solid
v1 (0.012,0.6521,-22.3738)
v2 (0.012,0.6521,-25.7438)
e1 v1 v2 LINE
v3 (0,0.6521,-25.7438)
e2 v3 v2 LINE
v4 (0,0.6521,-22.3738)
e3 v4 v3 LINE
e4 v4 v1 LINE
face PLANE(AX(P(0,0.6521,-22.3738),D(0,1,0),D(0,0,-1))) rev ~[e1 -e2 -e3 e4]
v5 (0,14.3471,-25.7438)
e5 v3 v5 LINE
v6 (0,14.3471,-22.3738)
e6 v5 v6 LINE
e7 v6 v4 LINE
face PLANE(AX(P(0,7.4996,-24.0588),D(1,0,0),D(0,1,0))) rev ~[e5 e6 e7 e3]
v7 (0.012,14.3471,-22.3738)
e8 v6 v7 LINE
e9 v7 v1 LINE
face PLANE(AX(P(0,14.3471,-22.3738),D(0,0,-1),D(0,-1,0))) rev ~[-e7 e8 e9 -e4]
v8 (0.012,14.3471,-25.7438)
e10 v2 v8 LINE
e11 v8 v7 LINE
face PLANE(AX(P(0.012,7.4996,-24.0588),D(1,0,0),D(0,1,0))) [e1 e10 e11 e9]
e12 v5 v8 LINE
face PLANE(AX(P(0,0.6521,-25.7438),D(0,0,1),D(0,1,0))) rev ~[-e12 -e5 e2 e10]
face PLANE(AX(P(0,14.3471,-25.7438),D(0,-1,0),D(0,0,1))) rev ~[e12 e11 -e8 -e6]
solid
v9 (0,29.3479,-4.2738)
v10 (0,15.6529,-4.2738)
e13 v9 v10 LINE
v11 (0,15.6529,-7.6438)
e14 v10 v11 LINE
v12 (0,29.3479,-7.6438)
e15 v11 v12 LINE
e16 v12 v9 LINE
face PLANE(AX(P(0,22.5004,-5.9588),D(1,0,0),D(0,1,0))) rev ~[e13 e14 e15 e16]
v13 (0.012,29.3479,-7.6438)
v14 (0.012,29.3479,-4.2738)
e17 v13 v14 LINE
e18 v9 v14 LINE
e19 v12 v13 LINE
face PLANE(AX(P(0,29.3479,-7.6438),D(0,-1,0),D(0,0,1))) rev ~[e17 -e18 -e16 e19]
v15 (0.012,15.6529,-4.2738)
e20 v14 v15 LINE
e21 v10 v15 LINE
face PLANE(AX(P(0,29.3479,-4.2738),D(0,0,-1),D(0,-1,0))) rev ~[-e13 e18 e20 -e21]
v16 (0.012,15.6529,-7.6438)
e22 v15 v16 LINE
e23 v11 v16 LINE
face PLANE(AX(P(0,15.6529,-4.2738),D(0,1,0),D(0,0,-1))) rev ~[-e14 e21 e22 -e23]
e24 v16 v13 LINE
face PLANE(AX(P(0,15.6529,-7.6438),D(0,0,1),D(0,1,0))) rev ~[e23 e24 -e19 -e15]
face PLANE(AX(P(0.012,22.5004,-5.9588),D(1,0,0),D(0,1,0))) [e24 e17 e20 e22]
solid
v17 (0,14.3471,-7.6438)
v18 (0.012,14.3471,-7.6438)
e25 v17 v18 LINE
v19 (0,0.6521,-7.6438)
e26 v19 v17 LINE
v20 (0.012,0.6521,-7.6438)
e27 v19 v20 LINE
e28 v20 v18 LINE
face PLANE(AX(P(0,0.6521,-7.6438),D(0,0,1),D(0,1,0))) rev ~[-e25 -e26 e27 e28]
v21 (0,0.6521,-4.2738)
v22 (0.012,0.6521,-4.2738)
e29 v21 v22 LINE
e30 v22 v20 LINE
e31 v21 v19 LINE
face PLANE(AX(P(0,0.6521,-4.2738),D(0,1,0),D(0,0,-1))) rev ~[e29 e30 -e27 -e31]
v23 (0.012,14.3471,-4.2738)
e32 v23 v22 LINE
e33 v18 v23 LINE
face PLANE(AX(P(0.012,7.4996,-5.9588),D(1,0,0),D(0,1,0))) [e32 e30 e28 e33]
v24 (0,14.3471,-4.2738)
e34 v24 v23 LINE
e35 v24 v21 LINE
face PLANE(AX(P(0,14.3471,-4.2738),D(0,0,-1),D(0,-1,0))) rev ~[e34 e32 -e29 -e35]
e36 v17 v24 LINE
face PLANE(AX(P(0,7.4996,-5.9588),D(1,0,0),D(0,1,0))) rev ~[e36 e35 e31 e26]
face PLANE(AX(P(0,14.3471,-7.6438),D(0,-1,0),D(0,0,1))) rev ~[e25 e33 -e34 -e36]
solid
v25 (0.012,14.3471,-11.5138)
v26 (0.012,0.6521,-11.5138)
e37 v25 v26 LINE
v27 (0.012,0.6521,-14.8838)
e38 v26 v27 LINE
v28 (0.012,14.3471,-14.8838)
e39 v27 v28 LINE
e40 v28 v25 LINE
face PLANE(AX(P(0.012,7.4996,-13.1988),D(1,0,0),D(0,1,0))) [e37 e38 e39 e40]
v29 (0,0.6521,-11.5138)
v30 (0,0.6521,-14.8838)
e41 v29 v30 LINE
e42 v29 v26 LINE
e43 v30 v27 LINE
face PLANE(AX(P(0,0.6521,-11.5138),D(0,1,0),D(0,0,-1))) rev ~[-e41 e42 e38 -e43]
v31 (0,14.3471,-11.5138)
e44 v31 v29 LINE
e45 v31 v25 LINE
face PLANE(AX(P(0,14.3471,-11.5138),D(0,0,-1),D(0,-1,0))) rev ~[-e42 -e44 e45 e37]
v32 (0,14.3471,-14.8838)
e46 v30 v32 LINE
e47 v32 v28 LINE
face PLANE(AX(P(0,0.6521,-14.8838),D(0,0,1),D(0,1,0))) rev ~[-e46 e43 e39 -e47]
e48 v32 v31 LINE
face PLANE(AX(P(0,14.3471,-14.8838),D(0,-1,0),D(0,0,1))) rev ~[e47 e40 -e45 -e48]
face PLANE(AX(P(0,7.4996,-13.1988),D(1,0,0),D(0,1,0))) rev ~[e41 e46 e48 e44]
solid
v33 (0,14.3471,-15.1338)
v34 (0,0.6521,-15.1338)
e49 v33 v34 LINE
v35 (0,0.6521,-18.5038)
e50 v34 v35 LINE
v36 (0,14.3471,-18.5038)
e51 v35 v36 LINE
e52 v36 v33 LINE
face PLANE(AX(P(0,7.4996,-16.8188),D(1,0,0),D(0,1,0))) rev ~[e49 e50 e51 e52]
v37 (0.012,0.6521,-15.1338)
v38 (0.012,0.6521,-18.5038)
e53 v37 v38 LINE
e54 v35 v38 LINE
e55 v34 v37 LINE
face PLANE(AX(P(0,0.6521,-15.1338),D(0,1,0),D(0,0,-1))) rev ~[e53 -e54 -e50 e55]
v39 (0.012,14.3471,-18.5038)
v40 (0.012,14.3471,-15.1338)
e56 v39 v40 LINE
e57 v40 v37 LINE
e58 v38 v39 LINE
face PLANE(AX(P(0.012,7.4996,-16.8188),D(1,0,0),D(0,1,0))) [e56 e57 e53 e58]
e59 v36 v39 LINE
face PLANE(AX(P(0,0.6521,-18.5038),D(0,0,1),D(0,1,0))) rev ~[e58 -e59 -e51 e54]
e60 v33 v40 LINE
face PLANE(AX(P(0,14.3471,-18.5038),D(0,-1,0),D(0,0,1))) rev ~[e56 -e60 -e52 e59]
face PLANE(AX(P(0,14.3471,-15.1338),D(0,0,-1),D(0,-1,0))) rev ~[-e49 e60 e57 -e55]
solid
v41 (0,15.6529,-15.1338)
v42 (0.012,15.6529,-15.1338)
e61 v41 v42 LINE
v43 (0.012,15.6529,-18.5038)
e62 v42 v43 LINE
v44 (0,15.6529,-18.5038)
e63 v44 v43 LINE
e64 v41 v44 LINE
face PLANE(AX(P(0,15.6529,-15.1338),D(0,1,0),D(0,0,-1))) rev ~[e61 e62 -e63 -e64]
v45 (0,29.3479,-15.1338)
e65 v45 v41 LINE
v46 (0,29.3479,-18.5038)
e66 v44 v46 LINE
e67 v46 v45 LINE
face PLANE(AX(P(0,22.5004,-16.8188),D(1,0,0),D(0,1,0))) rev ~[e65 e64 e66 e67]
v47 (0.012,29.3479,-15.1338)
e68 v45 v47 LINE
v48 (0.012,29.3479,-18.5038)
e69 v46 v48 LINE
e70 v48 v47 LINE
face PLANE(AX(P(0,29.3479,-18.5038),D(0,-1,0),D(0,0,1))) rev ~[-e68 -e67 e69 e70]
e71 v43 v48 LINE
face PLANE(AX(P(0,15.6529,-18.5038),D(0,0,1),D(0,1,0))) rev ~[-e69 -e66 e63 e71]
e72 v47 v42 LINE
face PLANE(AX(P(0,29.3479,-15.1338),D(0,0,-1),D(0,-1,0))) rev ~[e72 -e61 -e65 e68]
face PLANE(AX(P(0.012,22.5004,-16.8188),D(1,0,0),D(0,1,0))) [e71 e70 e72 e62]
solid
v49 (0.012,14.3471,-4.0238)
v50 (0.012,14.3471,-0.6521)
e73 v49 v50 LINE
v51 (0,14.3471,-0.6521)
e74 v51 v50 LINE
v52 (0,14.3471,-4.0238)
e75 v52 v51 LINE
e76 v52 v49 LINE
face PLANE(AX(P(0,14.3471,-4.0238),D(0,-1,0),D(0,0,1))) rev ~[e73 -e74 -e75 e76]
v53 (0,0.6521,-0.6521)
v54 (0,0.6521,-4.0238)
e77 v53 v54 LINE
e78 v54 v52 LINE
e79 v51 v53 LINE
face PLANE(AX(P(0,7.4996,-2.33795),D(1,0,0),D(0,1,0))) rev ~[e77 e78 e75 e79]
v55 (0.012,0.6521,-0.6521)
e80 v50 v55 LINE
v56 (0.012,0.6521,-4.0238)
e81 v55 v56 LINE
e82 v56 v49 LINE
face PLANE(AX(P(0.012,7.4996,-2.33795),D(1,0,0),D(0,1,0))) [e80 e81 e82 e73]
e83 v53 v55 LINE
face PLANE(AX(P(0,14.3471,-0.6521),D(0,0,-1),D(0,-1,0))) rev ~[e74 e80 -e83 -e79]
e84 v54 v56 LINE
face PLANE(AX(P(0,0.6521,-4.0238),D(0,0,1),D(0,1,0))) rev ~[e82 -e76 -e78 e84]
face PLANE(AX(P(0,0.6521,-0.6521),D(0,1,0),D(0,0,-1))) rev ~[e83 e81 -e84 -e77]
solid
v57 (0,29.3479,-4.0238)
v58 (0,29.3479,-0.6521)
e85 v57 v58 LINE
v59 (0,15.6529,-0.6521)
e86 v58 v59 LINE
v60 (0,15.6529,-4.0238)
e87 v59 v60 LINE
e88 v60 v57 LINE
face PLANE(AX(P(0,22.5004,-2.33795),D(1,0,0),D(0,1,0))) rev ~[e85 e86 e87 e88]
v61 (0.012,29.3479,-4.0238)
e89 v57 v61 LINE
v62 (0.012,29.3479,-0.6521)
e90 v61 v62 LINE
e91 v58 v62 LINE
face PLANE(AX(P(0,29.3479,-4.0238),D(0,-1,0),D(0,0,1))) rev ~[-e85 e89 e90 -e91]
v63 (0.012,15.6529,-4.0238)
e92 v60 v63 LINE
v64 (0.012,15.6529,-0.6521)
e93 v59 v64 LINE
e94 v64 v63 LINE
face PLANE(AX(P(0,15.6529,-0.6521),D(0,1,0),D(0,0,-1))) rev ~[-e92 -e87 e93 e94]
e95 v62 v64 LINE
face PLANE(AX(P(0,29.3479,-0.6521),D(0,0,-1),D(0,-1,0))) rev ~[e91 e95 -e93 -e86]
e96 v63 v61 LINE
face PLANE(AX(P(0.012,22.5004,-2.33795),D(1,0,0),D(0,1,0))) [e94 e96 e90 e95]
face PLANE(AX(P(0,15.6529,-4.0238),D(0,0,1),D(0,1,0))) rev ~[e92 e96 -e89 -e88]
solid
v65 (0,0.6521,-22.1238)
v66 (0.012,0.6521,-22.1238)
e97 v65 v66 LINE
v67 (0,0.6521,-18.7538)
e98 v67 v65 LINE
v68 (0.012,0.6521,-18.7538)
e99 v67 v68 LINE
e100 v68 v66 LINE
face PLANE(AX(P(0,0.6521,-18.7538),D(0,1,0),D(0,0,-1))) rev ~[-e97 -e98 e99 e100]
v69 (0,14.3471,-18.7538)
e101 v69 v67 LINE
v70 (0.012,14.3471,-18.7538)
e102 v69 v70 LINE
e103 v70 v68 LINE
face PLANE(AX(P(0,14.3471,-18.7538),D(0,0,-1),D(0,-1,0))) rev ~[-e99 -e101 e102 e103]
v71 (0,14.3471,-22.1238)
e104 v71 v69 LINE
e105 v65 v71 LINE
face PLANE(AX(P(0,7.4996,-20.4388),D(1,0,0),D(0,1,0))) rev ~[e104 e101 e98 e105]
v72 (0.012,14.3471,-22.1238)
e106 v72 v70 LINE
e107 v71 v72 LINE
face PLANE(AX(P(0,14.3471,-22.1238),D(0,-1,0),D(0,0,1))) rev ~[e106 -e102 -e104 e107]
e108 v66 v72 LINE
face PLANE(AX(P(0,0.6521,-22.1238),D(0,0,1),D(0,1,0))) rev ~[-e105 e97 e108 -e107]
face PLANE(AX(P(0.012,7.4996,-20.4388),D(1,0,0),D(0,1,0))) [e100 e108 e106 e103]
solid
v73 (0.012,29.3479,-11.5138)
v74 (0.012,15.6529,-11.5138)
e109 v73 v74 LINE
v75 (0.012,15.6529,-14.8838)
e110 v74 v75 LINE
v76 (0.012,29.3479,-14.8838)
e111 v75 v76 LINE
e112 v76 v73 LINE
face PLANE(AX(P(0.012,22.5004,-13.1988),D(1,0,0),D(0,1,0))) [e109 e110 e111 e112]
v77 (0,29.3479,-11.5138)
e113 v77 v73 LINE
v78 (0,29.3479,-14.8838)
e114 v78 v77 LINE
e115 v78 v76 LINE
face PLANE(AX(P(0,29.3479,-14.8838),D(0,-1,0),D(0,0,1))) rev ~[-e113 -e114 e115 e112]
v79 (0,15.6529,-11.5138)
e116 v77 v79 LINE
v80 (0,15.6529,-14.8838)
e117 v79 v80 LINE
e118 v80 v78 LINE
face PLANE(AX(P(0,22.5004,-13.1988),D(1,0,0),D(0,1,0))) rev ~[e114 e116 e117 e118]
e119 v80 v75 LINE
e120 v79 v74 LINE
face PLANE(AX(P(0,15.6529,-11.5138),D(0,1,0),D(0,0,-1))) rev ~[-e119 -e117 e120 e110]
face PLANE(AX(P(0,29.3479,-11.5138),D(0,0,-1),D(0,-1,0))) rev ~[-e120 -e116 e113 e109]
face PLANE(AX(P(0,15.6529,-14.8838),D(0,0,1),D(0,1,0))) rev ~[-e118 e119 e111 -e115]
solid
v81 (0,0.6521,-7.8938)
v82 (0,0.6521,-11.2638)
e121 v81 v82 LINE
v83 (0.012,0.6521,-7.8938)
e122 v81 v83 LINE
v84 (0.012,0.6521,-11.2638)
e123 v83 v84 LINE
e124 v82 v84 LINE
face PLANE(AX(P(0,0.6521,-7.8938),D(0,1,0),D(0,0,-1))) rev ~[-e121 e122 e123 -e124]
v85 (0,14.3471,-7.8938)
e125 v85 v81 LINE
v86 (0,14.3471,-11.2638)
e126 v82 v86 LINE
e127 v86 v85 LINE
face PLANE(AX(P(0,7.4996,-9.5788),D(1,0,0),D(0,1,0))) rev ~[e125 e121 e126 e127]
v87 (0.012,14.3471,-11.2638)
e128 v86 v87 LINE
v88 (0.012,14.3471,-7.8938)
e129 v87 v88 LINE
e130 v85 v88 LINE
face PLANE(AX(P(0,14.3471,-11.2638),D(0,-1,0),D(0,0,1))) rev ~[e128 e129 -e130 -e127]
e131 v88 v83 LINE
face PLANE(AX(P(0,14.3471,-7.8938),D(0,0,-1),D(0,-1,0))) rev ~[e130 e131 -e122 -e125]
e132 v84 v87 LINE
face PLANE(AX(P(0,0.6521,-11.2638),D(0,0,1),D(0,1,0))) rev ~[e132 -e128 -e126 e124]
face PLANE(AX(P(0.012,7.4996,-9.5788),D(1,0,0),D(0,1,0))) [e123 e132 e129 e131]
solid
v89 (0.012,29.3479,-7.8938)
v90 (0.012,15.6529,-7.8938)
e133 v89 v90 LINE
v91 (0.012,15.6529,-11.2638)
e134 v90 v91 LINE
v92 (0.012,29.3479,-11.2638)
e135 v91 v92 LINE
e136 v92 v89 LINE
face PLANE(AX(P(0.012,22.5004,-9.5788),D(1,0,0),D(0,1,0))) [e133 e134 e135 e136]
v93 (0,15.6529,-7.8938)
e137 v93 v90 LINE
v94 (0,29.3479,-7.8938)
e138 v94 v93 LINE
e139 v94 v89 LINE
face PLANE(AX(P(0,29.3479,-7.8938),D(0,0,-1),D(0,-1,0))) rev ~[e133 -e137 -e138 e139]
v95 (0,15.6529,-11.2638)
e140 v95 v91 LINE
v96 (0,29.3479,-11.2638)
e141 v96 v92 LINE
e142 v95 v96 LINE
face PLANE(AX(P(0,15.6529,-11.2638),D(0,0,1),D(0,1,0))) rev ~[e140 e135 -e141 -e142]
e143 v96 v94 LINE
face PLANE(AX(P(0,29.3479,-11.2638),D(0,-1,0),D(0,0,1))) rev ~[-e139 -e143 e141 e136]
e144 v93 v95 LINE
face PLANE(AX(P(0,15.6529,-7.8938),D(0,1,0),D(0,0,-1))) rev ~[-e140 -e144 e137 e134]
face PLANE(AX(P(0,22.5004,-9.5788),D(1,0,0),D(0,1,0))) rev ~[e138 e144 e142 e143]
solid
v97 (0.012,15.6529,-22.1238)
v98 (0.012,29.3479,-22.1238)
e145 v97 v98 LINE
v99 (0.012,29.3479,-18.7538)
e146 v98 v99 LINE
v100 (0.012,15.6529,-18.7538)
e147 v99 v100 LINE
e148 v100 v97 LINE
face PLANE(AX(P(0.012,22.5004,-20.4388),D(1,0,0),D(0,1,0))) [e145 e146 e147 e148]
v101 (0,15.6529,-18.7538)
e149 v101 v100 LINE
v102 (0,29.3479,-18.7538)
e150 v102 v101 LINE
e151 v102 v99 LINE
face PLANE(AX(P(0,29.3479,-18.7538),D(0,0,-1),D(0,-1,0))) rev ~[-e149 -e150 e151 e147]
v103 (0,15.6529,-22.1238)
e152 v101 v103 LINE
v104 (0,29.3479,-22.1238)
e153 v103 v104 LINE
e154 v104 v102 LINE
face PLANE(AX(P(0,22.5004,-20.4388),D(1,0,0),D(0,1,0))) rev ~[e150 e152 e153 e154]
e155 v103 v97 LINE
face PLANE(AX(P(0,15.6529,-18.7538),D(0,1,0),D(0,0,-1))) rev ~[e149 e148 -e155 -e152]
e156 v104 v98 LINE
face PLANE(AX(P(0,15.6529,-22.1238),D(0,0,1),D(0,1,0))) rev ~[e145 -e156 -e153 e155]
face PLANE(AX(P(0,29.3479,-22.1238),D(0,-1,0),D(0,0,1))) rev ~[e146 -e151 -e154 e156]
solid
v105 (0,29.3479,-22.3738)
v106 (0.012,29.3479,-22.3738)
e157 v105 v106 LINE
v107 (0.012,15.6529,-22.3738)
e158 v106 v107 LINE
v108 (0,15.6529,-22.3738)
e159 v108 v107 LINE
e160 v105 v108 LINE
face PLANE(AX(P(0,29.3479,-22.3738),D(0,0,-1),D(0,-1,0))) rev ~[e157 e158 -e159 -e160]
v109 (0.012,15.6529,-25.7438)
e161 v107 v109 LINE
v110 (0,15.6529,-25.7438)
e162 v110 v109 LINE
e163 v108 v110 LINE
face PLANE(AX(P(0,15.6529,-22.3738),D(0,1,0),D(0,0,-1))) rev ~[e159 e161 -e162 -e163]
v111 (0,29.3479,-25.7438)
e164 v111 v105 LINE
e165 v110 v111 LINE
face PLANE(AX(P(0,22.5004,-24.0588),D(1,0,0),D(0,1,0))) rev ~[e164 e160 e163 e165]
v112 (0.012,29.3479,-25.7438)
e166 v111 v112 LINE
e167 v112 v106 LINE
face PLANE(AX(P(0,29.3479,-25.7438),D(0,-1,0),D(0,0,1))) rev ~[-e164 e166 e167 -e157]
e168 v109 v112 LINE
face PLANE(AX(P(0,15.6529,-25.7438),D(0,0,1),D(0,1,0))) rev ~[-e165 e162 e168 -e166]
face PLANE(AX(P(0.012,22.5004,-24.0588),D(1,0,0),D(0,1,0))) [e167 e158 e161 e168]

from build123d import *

# Parameters (mm, degrees)
F1_DEPTH = 0.012


# Not quite as in the source:
# - a feature names something its author has since deleted; it is built from what else it names


with BuildPart() as f1:
    # F0 (on Right) → F1 (new body)
    with BuildSketch(Plane.YZ):
        Polygon((14.3471, -0.6521), (0.6521, -0.6521), (0.6521, -2.2088), (0.6521, -2.4638), (0.6521, -4.0238), (14.3471, -4.0238), (14.3471, -2.4638), (14.3471, -2.2088), align=None)
    extrude(amount=F1_DEPTH)


with BuildPart() as f1b:
    # F0 (on Right) → F1, piece 2 (new body)
    with BuildSketch(Plane.YZ):
        Polygon((14.3471, -4.2738), (0.6521, -4.2738), (0.6521, -5.8338), (0.6521, -6.0838), (0.6521, -7.6438), (14.3471, -7.6438), (14.3471, -6.0838), (14.3471, -5.8338), align=None)
    extrude(amount=F1_DEPTH)


with BuildPart() as f1c:
    # F0 (on Right) → F1, piece 3 (new body)
    with BuildSketch(Plane.YZ):
        Polygon((14.3471, -11.5138), (0.6521, -11.5138), (0.6521, -13.0738), (0.6521, -13.3238), (0.6521, -14.8838), (14.3471, -14.8838), (14.3471, -13.3238), (14.3471, -13.0738), align=None)
    extrude(amount=F1_DEPTH)


with BuildPart() as f1d:
    # F0 (on Right) → F1, piece 4 (new body)
    with BuildSketch(Plane.YZ):
        Polygon((14.3471, -7.8938), (0.6521, -7.8938), (0.6521, -9.4538), (0.6521, -9.7038), (0.6521, -11.2638), (14.3471, -11.2638), (14.3471, -9.7038), (14.3471, -9.4538), align=None)
    extrude(amount=F1_DEPTH)


with BuildPart() as f1e:
    # F0 (on Right) → F1, piece 5 (new body)
    with BuildSketch(Plane.YZ):
        Polygon((14.3471, -15.1338), (0.6521, -15.1338), (0.6521, -16.6938), (0.6521, -18.5038), (14.3471, -18.5038), (14.3471, -16.9438), (14.3471, -16.6938), align=None)
    extrude(amount=F1_DEPTH)


with BuildPart() as f1f:
    # F0 (on Right) → F1, piece 6 (new body)
    with BuildSketch(Plane.YZ):
        Polygon((14.3471, -18.7538), (0.6521, -18.7538), (0.6521, -20.3138), (0.6521, -20.5638), (0.6521, -22.1238), (14.3471, -22.1238), (14.3471, -20.5638), (14.3471, -20.3138), align=None)
    extrude(amount=F1_DEPTH)


with BuildPart() as f1g:
    # F0 (on Right) → F1, piece 7 (new body)
    with BuildSketch(Plane.YZ):
        Polygon((14.3471, -22.3738), (0.6521, -22.3738), (0.6521, -23.9338), (0.6521, -24.1838), (0.6521, -25.7438), (14.3471, -25.7438), (14.3471, -24.1838), (14.3471, -23.9338), align=None)
    extrude(amount=F1_DEPTH)


with BuildPart() as f1h:
    # F0 (on Right) → F1, piece 8 (new body)
    with BuildSketch(Plane.YZ):
        Polygon((29.3479, -22.3738), (15.6529, -22.3738), (15.6529, -23.9338), (15.6529, -24.1838), (15.6529, -25.7438), (29.3479, -25.7438), (29.3479, -24.1838), (29.3479, -23.9338), align=None)
    extrude(amount=F1_DEPTH)


with BuildPart() as f1i:
    # F0 (on Right) → F1, piece 9 (new body)
    with BuildSketch(Plane.YZ):
        Polygon((29.3479, -7.6438), (29.3479, -6.0838), (29.3479, -5.8338), (29.3479, -4.2738), (15.6529, -4.2738), (15.6529, -5.8338), (15.6529, -6.0838), (15.6529, -7.6438), align=None)
    extrude(amount=F1_DEPTH)


with BuildPart() as f1j:
    # F0 (on Right) → F1, piece 10 (new body)
    with BuildSketch(Plane.YZ):
        Polygon((29.3479, -9.4538), (29.3479, -7.8938), (15.6529, -7.8938), (15.6529, -9.4538), (15.6529, -9.7038), (15.6529, -11.2638), (29.3479, -11.2638), (29.3479, -9.7038), align=None)
    extrude(amount=F1_DEPTH)


with BuildPart() as f1k:
    # F0 (on Right) → F1, piece 11 (new body)
    with BuildSketch(Plane.YZ):
        Polygon((29.3479, -13.0738), (29.3479, -11.5138), (15.6529, -11.5138), (15.6529, -13.0738), (15.6529, -13.3238), (15.6529, -14.8838), (29.3479, -14.8838), (29.3479, -13.3238), align=None)
    extrude(amount=F1_DEPTH)


with BuildPart() as f1l:
    # F0 (on Right) → F1, piece 12 (new body)
    with BuildSketch(Plane.YZ):
        Polygon((29.3479, -22.1238), (29.3479, -20.5638), (29.3479, -20.3138), (29.3479, -18.7538), (15.6529, -18.7538), (15.6529, -20.3138), (15.6529, -20.5638), (15.6529, -22.1238), align=None)
    extrude(amount=F1_DEPTH)


with BuildPart() as f1m:
    # F0 (on Right) → F1, piece 13 (new body)
    with BuildSketch(Plane.YZ):
        Polygon((15.6529, -15.1338), (15.6529, -16.6938), (15.6529, -16.9438), (15.6529, -18.5038), (29.3479, -18.5038), (29.3479, -16.6938), (29.3479, -15.1338), align=None)
    extrude(amount=F1_DEPTH)


with BuildPart() as f1n:
    # F0 (on Right) → F1, piece 14 (new body)
    with BuildSketch(Plane.YZ):
        Polygon((29.3479, -2.2088), (29.3479, -0.6521), (15.6529, -0.6521), (15.6529, -2.2088), (15.6529, -2.4638), (15.6529, -4.0238), (29.3479, -4.0238), (29.3479, -2.4638), align=None)
    extrude(amount=F1_DEPTH)


solid = Compound([f1.part, f1b.part, f1c.part, f1d.part, f1e.part, f1f.part, f1g.part, f1h.part, f1i.part, f1j.part, f1k.part, f1l.part, f1m.part, f1n.part])
